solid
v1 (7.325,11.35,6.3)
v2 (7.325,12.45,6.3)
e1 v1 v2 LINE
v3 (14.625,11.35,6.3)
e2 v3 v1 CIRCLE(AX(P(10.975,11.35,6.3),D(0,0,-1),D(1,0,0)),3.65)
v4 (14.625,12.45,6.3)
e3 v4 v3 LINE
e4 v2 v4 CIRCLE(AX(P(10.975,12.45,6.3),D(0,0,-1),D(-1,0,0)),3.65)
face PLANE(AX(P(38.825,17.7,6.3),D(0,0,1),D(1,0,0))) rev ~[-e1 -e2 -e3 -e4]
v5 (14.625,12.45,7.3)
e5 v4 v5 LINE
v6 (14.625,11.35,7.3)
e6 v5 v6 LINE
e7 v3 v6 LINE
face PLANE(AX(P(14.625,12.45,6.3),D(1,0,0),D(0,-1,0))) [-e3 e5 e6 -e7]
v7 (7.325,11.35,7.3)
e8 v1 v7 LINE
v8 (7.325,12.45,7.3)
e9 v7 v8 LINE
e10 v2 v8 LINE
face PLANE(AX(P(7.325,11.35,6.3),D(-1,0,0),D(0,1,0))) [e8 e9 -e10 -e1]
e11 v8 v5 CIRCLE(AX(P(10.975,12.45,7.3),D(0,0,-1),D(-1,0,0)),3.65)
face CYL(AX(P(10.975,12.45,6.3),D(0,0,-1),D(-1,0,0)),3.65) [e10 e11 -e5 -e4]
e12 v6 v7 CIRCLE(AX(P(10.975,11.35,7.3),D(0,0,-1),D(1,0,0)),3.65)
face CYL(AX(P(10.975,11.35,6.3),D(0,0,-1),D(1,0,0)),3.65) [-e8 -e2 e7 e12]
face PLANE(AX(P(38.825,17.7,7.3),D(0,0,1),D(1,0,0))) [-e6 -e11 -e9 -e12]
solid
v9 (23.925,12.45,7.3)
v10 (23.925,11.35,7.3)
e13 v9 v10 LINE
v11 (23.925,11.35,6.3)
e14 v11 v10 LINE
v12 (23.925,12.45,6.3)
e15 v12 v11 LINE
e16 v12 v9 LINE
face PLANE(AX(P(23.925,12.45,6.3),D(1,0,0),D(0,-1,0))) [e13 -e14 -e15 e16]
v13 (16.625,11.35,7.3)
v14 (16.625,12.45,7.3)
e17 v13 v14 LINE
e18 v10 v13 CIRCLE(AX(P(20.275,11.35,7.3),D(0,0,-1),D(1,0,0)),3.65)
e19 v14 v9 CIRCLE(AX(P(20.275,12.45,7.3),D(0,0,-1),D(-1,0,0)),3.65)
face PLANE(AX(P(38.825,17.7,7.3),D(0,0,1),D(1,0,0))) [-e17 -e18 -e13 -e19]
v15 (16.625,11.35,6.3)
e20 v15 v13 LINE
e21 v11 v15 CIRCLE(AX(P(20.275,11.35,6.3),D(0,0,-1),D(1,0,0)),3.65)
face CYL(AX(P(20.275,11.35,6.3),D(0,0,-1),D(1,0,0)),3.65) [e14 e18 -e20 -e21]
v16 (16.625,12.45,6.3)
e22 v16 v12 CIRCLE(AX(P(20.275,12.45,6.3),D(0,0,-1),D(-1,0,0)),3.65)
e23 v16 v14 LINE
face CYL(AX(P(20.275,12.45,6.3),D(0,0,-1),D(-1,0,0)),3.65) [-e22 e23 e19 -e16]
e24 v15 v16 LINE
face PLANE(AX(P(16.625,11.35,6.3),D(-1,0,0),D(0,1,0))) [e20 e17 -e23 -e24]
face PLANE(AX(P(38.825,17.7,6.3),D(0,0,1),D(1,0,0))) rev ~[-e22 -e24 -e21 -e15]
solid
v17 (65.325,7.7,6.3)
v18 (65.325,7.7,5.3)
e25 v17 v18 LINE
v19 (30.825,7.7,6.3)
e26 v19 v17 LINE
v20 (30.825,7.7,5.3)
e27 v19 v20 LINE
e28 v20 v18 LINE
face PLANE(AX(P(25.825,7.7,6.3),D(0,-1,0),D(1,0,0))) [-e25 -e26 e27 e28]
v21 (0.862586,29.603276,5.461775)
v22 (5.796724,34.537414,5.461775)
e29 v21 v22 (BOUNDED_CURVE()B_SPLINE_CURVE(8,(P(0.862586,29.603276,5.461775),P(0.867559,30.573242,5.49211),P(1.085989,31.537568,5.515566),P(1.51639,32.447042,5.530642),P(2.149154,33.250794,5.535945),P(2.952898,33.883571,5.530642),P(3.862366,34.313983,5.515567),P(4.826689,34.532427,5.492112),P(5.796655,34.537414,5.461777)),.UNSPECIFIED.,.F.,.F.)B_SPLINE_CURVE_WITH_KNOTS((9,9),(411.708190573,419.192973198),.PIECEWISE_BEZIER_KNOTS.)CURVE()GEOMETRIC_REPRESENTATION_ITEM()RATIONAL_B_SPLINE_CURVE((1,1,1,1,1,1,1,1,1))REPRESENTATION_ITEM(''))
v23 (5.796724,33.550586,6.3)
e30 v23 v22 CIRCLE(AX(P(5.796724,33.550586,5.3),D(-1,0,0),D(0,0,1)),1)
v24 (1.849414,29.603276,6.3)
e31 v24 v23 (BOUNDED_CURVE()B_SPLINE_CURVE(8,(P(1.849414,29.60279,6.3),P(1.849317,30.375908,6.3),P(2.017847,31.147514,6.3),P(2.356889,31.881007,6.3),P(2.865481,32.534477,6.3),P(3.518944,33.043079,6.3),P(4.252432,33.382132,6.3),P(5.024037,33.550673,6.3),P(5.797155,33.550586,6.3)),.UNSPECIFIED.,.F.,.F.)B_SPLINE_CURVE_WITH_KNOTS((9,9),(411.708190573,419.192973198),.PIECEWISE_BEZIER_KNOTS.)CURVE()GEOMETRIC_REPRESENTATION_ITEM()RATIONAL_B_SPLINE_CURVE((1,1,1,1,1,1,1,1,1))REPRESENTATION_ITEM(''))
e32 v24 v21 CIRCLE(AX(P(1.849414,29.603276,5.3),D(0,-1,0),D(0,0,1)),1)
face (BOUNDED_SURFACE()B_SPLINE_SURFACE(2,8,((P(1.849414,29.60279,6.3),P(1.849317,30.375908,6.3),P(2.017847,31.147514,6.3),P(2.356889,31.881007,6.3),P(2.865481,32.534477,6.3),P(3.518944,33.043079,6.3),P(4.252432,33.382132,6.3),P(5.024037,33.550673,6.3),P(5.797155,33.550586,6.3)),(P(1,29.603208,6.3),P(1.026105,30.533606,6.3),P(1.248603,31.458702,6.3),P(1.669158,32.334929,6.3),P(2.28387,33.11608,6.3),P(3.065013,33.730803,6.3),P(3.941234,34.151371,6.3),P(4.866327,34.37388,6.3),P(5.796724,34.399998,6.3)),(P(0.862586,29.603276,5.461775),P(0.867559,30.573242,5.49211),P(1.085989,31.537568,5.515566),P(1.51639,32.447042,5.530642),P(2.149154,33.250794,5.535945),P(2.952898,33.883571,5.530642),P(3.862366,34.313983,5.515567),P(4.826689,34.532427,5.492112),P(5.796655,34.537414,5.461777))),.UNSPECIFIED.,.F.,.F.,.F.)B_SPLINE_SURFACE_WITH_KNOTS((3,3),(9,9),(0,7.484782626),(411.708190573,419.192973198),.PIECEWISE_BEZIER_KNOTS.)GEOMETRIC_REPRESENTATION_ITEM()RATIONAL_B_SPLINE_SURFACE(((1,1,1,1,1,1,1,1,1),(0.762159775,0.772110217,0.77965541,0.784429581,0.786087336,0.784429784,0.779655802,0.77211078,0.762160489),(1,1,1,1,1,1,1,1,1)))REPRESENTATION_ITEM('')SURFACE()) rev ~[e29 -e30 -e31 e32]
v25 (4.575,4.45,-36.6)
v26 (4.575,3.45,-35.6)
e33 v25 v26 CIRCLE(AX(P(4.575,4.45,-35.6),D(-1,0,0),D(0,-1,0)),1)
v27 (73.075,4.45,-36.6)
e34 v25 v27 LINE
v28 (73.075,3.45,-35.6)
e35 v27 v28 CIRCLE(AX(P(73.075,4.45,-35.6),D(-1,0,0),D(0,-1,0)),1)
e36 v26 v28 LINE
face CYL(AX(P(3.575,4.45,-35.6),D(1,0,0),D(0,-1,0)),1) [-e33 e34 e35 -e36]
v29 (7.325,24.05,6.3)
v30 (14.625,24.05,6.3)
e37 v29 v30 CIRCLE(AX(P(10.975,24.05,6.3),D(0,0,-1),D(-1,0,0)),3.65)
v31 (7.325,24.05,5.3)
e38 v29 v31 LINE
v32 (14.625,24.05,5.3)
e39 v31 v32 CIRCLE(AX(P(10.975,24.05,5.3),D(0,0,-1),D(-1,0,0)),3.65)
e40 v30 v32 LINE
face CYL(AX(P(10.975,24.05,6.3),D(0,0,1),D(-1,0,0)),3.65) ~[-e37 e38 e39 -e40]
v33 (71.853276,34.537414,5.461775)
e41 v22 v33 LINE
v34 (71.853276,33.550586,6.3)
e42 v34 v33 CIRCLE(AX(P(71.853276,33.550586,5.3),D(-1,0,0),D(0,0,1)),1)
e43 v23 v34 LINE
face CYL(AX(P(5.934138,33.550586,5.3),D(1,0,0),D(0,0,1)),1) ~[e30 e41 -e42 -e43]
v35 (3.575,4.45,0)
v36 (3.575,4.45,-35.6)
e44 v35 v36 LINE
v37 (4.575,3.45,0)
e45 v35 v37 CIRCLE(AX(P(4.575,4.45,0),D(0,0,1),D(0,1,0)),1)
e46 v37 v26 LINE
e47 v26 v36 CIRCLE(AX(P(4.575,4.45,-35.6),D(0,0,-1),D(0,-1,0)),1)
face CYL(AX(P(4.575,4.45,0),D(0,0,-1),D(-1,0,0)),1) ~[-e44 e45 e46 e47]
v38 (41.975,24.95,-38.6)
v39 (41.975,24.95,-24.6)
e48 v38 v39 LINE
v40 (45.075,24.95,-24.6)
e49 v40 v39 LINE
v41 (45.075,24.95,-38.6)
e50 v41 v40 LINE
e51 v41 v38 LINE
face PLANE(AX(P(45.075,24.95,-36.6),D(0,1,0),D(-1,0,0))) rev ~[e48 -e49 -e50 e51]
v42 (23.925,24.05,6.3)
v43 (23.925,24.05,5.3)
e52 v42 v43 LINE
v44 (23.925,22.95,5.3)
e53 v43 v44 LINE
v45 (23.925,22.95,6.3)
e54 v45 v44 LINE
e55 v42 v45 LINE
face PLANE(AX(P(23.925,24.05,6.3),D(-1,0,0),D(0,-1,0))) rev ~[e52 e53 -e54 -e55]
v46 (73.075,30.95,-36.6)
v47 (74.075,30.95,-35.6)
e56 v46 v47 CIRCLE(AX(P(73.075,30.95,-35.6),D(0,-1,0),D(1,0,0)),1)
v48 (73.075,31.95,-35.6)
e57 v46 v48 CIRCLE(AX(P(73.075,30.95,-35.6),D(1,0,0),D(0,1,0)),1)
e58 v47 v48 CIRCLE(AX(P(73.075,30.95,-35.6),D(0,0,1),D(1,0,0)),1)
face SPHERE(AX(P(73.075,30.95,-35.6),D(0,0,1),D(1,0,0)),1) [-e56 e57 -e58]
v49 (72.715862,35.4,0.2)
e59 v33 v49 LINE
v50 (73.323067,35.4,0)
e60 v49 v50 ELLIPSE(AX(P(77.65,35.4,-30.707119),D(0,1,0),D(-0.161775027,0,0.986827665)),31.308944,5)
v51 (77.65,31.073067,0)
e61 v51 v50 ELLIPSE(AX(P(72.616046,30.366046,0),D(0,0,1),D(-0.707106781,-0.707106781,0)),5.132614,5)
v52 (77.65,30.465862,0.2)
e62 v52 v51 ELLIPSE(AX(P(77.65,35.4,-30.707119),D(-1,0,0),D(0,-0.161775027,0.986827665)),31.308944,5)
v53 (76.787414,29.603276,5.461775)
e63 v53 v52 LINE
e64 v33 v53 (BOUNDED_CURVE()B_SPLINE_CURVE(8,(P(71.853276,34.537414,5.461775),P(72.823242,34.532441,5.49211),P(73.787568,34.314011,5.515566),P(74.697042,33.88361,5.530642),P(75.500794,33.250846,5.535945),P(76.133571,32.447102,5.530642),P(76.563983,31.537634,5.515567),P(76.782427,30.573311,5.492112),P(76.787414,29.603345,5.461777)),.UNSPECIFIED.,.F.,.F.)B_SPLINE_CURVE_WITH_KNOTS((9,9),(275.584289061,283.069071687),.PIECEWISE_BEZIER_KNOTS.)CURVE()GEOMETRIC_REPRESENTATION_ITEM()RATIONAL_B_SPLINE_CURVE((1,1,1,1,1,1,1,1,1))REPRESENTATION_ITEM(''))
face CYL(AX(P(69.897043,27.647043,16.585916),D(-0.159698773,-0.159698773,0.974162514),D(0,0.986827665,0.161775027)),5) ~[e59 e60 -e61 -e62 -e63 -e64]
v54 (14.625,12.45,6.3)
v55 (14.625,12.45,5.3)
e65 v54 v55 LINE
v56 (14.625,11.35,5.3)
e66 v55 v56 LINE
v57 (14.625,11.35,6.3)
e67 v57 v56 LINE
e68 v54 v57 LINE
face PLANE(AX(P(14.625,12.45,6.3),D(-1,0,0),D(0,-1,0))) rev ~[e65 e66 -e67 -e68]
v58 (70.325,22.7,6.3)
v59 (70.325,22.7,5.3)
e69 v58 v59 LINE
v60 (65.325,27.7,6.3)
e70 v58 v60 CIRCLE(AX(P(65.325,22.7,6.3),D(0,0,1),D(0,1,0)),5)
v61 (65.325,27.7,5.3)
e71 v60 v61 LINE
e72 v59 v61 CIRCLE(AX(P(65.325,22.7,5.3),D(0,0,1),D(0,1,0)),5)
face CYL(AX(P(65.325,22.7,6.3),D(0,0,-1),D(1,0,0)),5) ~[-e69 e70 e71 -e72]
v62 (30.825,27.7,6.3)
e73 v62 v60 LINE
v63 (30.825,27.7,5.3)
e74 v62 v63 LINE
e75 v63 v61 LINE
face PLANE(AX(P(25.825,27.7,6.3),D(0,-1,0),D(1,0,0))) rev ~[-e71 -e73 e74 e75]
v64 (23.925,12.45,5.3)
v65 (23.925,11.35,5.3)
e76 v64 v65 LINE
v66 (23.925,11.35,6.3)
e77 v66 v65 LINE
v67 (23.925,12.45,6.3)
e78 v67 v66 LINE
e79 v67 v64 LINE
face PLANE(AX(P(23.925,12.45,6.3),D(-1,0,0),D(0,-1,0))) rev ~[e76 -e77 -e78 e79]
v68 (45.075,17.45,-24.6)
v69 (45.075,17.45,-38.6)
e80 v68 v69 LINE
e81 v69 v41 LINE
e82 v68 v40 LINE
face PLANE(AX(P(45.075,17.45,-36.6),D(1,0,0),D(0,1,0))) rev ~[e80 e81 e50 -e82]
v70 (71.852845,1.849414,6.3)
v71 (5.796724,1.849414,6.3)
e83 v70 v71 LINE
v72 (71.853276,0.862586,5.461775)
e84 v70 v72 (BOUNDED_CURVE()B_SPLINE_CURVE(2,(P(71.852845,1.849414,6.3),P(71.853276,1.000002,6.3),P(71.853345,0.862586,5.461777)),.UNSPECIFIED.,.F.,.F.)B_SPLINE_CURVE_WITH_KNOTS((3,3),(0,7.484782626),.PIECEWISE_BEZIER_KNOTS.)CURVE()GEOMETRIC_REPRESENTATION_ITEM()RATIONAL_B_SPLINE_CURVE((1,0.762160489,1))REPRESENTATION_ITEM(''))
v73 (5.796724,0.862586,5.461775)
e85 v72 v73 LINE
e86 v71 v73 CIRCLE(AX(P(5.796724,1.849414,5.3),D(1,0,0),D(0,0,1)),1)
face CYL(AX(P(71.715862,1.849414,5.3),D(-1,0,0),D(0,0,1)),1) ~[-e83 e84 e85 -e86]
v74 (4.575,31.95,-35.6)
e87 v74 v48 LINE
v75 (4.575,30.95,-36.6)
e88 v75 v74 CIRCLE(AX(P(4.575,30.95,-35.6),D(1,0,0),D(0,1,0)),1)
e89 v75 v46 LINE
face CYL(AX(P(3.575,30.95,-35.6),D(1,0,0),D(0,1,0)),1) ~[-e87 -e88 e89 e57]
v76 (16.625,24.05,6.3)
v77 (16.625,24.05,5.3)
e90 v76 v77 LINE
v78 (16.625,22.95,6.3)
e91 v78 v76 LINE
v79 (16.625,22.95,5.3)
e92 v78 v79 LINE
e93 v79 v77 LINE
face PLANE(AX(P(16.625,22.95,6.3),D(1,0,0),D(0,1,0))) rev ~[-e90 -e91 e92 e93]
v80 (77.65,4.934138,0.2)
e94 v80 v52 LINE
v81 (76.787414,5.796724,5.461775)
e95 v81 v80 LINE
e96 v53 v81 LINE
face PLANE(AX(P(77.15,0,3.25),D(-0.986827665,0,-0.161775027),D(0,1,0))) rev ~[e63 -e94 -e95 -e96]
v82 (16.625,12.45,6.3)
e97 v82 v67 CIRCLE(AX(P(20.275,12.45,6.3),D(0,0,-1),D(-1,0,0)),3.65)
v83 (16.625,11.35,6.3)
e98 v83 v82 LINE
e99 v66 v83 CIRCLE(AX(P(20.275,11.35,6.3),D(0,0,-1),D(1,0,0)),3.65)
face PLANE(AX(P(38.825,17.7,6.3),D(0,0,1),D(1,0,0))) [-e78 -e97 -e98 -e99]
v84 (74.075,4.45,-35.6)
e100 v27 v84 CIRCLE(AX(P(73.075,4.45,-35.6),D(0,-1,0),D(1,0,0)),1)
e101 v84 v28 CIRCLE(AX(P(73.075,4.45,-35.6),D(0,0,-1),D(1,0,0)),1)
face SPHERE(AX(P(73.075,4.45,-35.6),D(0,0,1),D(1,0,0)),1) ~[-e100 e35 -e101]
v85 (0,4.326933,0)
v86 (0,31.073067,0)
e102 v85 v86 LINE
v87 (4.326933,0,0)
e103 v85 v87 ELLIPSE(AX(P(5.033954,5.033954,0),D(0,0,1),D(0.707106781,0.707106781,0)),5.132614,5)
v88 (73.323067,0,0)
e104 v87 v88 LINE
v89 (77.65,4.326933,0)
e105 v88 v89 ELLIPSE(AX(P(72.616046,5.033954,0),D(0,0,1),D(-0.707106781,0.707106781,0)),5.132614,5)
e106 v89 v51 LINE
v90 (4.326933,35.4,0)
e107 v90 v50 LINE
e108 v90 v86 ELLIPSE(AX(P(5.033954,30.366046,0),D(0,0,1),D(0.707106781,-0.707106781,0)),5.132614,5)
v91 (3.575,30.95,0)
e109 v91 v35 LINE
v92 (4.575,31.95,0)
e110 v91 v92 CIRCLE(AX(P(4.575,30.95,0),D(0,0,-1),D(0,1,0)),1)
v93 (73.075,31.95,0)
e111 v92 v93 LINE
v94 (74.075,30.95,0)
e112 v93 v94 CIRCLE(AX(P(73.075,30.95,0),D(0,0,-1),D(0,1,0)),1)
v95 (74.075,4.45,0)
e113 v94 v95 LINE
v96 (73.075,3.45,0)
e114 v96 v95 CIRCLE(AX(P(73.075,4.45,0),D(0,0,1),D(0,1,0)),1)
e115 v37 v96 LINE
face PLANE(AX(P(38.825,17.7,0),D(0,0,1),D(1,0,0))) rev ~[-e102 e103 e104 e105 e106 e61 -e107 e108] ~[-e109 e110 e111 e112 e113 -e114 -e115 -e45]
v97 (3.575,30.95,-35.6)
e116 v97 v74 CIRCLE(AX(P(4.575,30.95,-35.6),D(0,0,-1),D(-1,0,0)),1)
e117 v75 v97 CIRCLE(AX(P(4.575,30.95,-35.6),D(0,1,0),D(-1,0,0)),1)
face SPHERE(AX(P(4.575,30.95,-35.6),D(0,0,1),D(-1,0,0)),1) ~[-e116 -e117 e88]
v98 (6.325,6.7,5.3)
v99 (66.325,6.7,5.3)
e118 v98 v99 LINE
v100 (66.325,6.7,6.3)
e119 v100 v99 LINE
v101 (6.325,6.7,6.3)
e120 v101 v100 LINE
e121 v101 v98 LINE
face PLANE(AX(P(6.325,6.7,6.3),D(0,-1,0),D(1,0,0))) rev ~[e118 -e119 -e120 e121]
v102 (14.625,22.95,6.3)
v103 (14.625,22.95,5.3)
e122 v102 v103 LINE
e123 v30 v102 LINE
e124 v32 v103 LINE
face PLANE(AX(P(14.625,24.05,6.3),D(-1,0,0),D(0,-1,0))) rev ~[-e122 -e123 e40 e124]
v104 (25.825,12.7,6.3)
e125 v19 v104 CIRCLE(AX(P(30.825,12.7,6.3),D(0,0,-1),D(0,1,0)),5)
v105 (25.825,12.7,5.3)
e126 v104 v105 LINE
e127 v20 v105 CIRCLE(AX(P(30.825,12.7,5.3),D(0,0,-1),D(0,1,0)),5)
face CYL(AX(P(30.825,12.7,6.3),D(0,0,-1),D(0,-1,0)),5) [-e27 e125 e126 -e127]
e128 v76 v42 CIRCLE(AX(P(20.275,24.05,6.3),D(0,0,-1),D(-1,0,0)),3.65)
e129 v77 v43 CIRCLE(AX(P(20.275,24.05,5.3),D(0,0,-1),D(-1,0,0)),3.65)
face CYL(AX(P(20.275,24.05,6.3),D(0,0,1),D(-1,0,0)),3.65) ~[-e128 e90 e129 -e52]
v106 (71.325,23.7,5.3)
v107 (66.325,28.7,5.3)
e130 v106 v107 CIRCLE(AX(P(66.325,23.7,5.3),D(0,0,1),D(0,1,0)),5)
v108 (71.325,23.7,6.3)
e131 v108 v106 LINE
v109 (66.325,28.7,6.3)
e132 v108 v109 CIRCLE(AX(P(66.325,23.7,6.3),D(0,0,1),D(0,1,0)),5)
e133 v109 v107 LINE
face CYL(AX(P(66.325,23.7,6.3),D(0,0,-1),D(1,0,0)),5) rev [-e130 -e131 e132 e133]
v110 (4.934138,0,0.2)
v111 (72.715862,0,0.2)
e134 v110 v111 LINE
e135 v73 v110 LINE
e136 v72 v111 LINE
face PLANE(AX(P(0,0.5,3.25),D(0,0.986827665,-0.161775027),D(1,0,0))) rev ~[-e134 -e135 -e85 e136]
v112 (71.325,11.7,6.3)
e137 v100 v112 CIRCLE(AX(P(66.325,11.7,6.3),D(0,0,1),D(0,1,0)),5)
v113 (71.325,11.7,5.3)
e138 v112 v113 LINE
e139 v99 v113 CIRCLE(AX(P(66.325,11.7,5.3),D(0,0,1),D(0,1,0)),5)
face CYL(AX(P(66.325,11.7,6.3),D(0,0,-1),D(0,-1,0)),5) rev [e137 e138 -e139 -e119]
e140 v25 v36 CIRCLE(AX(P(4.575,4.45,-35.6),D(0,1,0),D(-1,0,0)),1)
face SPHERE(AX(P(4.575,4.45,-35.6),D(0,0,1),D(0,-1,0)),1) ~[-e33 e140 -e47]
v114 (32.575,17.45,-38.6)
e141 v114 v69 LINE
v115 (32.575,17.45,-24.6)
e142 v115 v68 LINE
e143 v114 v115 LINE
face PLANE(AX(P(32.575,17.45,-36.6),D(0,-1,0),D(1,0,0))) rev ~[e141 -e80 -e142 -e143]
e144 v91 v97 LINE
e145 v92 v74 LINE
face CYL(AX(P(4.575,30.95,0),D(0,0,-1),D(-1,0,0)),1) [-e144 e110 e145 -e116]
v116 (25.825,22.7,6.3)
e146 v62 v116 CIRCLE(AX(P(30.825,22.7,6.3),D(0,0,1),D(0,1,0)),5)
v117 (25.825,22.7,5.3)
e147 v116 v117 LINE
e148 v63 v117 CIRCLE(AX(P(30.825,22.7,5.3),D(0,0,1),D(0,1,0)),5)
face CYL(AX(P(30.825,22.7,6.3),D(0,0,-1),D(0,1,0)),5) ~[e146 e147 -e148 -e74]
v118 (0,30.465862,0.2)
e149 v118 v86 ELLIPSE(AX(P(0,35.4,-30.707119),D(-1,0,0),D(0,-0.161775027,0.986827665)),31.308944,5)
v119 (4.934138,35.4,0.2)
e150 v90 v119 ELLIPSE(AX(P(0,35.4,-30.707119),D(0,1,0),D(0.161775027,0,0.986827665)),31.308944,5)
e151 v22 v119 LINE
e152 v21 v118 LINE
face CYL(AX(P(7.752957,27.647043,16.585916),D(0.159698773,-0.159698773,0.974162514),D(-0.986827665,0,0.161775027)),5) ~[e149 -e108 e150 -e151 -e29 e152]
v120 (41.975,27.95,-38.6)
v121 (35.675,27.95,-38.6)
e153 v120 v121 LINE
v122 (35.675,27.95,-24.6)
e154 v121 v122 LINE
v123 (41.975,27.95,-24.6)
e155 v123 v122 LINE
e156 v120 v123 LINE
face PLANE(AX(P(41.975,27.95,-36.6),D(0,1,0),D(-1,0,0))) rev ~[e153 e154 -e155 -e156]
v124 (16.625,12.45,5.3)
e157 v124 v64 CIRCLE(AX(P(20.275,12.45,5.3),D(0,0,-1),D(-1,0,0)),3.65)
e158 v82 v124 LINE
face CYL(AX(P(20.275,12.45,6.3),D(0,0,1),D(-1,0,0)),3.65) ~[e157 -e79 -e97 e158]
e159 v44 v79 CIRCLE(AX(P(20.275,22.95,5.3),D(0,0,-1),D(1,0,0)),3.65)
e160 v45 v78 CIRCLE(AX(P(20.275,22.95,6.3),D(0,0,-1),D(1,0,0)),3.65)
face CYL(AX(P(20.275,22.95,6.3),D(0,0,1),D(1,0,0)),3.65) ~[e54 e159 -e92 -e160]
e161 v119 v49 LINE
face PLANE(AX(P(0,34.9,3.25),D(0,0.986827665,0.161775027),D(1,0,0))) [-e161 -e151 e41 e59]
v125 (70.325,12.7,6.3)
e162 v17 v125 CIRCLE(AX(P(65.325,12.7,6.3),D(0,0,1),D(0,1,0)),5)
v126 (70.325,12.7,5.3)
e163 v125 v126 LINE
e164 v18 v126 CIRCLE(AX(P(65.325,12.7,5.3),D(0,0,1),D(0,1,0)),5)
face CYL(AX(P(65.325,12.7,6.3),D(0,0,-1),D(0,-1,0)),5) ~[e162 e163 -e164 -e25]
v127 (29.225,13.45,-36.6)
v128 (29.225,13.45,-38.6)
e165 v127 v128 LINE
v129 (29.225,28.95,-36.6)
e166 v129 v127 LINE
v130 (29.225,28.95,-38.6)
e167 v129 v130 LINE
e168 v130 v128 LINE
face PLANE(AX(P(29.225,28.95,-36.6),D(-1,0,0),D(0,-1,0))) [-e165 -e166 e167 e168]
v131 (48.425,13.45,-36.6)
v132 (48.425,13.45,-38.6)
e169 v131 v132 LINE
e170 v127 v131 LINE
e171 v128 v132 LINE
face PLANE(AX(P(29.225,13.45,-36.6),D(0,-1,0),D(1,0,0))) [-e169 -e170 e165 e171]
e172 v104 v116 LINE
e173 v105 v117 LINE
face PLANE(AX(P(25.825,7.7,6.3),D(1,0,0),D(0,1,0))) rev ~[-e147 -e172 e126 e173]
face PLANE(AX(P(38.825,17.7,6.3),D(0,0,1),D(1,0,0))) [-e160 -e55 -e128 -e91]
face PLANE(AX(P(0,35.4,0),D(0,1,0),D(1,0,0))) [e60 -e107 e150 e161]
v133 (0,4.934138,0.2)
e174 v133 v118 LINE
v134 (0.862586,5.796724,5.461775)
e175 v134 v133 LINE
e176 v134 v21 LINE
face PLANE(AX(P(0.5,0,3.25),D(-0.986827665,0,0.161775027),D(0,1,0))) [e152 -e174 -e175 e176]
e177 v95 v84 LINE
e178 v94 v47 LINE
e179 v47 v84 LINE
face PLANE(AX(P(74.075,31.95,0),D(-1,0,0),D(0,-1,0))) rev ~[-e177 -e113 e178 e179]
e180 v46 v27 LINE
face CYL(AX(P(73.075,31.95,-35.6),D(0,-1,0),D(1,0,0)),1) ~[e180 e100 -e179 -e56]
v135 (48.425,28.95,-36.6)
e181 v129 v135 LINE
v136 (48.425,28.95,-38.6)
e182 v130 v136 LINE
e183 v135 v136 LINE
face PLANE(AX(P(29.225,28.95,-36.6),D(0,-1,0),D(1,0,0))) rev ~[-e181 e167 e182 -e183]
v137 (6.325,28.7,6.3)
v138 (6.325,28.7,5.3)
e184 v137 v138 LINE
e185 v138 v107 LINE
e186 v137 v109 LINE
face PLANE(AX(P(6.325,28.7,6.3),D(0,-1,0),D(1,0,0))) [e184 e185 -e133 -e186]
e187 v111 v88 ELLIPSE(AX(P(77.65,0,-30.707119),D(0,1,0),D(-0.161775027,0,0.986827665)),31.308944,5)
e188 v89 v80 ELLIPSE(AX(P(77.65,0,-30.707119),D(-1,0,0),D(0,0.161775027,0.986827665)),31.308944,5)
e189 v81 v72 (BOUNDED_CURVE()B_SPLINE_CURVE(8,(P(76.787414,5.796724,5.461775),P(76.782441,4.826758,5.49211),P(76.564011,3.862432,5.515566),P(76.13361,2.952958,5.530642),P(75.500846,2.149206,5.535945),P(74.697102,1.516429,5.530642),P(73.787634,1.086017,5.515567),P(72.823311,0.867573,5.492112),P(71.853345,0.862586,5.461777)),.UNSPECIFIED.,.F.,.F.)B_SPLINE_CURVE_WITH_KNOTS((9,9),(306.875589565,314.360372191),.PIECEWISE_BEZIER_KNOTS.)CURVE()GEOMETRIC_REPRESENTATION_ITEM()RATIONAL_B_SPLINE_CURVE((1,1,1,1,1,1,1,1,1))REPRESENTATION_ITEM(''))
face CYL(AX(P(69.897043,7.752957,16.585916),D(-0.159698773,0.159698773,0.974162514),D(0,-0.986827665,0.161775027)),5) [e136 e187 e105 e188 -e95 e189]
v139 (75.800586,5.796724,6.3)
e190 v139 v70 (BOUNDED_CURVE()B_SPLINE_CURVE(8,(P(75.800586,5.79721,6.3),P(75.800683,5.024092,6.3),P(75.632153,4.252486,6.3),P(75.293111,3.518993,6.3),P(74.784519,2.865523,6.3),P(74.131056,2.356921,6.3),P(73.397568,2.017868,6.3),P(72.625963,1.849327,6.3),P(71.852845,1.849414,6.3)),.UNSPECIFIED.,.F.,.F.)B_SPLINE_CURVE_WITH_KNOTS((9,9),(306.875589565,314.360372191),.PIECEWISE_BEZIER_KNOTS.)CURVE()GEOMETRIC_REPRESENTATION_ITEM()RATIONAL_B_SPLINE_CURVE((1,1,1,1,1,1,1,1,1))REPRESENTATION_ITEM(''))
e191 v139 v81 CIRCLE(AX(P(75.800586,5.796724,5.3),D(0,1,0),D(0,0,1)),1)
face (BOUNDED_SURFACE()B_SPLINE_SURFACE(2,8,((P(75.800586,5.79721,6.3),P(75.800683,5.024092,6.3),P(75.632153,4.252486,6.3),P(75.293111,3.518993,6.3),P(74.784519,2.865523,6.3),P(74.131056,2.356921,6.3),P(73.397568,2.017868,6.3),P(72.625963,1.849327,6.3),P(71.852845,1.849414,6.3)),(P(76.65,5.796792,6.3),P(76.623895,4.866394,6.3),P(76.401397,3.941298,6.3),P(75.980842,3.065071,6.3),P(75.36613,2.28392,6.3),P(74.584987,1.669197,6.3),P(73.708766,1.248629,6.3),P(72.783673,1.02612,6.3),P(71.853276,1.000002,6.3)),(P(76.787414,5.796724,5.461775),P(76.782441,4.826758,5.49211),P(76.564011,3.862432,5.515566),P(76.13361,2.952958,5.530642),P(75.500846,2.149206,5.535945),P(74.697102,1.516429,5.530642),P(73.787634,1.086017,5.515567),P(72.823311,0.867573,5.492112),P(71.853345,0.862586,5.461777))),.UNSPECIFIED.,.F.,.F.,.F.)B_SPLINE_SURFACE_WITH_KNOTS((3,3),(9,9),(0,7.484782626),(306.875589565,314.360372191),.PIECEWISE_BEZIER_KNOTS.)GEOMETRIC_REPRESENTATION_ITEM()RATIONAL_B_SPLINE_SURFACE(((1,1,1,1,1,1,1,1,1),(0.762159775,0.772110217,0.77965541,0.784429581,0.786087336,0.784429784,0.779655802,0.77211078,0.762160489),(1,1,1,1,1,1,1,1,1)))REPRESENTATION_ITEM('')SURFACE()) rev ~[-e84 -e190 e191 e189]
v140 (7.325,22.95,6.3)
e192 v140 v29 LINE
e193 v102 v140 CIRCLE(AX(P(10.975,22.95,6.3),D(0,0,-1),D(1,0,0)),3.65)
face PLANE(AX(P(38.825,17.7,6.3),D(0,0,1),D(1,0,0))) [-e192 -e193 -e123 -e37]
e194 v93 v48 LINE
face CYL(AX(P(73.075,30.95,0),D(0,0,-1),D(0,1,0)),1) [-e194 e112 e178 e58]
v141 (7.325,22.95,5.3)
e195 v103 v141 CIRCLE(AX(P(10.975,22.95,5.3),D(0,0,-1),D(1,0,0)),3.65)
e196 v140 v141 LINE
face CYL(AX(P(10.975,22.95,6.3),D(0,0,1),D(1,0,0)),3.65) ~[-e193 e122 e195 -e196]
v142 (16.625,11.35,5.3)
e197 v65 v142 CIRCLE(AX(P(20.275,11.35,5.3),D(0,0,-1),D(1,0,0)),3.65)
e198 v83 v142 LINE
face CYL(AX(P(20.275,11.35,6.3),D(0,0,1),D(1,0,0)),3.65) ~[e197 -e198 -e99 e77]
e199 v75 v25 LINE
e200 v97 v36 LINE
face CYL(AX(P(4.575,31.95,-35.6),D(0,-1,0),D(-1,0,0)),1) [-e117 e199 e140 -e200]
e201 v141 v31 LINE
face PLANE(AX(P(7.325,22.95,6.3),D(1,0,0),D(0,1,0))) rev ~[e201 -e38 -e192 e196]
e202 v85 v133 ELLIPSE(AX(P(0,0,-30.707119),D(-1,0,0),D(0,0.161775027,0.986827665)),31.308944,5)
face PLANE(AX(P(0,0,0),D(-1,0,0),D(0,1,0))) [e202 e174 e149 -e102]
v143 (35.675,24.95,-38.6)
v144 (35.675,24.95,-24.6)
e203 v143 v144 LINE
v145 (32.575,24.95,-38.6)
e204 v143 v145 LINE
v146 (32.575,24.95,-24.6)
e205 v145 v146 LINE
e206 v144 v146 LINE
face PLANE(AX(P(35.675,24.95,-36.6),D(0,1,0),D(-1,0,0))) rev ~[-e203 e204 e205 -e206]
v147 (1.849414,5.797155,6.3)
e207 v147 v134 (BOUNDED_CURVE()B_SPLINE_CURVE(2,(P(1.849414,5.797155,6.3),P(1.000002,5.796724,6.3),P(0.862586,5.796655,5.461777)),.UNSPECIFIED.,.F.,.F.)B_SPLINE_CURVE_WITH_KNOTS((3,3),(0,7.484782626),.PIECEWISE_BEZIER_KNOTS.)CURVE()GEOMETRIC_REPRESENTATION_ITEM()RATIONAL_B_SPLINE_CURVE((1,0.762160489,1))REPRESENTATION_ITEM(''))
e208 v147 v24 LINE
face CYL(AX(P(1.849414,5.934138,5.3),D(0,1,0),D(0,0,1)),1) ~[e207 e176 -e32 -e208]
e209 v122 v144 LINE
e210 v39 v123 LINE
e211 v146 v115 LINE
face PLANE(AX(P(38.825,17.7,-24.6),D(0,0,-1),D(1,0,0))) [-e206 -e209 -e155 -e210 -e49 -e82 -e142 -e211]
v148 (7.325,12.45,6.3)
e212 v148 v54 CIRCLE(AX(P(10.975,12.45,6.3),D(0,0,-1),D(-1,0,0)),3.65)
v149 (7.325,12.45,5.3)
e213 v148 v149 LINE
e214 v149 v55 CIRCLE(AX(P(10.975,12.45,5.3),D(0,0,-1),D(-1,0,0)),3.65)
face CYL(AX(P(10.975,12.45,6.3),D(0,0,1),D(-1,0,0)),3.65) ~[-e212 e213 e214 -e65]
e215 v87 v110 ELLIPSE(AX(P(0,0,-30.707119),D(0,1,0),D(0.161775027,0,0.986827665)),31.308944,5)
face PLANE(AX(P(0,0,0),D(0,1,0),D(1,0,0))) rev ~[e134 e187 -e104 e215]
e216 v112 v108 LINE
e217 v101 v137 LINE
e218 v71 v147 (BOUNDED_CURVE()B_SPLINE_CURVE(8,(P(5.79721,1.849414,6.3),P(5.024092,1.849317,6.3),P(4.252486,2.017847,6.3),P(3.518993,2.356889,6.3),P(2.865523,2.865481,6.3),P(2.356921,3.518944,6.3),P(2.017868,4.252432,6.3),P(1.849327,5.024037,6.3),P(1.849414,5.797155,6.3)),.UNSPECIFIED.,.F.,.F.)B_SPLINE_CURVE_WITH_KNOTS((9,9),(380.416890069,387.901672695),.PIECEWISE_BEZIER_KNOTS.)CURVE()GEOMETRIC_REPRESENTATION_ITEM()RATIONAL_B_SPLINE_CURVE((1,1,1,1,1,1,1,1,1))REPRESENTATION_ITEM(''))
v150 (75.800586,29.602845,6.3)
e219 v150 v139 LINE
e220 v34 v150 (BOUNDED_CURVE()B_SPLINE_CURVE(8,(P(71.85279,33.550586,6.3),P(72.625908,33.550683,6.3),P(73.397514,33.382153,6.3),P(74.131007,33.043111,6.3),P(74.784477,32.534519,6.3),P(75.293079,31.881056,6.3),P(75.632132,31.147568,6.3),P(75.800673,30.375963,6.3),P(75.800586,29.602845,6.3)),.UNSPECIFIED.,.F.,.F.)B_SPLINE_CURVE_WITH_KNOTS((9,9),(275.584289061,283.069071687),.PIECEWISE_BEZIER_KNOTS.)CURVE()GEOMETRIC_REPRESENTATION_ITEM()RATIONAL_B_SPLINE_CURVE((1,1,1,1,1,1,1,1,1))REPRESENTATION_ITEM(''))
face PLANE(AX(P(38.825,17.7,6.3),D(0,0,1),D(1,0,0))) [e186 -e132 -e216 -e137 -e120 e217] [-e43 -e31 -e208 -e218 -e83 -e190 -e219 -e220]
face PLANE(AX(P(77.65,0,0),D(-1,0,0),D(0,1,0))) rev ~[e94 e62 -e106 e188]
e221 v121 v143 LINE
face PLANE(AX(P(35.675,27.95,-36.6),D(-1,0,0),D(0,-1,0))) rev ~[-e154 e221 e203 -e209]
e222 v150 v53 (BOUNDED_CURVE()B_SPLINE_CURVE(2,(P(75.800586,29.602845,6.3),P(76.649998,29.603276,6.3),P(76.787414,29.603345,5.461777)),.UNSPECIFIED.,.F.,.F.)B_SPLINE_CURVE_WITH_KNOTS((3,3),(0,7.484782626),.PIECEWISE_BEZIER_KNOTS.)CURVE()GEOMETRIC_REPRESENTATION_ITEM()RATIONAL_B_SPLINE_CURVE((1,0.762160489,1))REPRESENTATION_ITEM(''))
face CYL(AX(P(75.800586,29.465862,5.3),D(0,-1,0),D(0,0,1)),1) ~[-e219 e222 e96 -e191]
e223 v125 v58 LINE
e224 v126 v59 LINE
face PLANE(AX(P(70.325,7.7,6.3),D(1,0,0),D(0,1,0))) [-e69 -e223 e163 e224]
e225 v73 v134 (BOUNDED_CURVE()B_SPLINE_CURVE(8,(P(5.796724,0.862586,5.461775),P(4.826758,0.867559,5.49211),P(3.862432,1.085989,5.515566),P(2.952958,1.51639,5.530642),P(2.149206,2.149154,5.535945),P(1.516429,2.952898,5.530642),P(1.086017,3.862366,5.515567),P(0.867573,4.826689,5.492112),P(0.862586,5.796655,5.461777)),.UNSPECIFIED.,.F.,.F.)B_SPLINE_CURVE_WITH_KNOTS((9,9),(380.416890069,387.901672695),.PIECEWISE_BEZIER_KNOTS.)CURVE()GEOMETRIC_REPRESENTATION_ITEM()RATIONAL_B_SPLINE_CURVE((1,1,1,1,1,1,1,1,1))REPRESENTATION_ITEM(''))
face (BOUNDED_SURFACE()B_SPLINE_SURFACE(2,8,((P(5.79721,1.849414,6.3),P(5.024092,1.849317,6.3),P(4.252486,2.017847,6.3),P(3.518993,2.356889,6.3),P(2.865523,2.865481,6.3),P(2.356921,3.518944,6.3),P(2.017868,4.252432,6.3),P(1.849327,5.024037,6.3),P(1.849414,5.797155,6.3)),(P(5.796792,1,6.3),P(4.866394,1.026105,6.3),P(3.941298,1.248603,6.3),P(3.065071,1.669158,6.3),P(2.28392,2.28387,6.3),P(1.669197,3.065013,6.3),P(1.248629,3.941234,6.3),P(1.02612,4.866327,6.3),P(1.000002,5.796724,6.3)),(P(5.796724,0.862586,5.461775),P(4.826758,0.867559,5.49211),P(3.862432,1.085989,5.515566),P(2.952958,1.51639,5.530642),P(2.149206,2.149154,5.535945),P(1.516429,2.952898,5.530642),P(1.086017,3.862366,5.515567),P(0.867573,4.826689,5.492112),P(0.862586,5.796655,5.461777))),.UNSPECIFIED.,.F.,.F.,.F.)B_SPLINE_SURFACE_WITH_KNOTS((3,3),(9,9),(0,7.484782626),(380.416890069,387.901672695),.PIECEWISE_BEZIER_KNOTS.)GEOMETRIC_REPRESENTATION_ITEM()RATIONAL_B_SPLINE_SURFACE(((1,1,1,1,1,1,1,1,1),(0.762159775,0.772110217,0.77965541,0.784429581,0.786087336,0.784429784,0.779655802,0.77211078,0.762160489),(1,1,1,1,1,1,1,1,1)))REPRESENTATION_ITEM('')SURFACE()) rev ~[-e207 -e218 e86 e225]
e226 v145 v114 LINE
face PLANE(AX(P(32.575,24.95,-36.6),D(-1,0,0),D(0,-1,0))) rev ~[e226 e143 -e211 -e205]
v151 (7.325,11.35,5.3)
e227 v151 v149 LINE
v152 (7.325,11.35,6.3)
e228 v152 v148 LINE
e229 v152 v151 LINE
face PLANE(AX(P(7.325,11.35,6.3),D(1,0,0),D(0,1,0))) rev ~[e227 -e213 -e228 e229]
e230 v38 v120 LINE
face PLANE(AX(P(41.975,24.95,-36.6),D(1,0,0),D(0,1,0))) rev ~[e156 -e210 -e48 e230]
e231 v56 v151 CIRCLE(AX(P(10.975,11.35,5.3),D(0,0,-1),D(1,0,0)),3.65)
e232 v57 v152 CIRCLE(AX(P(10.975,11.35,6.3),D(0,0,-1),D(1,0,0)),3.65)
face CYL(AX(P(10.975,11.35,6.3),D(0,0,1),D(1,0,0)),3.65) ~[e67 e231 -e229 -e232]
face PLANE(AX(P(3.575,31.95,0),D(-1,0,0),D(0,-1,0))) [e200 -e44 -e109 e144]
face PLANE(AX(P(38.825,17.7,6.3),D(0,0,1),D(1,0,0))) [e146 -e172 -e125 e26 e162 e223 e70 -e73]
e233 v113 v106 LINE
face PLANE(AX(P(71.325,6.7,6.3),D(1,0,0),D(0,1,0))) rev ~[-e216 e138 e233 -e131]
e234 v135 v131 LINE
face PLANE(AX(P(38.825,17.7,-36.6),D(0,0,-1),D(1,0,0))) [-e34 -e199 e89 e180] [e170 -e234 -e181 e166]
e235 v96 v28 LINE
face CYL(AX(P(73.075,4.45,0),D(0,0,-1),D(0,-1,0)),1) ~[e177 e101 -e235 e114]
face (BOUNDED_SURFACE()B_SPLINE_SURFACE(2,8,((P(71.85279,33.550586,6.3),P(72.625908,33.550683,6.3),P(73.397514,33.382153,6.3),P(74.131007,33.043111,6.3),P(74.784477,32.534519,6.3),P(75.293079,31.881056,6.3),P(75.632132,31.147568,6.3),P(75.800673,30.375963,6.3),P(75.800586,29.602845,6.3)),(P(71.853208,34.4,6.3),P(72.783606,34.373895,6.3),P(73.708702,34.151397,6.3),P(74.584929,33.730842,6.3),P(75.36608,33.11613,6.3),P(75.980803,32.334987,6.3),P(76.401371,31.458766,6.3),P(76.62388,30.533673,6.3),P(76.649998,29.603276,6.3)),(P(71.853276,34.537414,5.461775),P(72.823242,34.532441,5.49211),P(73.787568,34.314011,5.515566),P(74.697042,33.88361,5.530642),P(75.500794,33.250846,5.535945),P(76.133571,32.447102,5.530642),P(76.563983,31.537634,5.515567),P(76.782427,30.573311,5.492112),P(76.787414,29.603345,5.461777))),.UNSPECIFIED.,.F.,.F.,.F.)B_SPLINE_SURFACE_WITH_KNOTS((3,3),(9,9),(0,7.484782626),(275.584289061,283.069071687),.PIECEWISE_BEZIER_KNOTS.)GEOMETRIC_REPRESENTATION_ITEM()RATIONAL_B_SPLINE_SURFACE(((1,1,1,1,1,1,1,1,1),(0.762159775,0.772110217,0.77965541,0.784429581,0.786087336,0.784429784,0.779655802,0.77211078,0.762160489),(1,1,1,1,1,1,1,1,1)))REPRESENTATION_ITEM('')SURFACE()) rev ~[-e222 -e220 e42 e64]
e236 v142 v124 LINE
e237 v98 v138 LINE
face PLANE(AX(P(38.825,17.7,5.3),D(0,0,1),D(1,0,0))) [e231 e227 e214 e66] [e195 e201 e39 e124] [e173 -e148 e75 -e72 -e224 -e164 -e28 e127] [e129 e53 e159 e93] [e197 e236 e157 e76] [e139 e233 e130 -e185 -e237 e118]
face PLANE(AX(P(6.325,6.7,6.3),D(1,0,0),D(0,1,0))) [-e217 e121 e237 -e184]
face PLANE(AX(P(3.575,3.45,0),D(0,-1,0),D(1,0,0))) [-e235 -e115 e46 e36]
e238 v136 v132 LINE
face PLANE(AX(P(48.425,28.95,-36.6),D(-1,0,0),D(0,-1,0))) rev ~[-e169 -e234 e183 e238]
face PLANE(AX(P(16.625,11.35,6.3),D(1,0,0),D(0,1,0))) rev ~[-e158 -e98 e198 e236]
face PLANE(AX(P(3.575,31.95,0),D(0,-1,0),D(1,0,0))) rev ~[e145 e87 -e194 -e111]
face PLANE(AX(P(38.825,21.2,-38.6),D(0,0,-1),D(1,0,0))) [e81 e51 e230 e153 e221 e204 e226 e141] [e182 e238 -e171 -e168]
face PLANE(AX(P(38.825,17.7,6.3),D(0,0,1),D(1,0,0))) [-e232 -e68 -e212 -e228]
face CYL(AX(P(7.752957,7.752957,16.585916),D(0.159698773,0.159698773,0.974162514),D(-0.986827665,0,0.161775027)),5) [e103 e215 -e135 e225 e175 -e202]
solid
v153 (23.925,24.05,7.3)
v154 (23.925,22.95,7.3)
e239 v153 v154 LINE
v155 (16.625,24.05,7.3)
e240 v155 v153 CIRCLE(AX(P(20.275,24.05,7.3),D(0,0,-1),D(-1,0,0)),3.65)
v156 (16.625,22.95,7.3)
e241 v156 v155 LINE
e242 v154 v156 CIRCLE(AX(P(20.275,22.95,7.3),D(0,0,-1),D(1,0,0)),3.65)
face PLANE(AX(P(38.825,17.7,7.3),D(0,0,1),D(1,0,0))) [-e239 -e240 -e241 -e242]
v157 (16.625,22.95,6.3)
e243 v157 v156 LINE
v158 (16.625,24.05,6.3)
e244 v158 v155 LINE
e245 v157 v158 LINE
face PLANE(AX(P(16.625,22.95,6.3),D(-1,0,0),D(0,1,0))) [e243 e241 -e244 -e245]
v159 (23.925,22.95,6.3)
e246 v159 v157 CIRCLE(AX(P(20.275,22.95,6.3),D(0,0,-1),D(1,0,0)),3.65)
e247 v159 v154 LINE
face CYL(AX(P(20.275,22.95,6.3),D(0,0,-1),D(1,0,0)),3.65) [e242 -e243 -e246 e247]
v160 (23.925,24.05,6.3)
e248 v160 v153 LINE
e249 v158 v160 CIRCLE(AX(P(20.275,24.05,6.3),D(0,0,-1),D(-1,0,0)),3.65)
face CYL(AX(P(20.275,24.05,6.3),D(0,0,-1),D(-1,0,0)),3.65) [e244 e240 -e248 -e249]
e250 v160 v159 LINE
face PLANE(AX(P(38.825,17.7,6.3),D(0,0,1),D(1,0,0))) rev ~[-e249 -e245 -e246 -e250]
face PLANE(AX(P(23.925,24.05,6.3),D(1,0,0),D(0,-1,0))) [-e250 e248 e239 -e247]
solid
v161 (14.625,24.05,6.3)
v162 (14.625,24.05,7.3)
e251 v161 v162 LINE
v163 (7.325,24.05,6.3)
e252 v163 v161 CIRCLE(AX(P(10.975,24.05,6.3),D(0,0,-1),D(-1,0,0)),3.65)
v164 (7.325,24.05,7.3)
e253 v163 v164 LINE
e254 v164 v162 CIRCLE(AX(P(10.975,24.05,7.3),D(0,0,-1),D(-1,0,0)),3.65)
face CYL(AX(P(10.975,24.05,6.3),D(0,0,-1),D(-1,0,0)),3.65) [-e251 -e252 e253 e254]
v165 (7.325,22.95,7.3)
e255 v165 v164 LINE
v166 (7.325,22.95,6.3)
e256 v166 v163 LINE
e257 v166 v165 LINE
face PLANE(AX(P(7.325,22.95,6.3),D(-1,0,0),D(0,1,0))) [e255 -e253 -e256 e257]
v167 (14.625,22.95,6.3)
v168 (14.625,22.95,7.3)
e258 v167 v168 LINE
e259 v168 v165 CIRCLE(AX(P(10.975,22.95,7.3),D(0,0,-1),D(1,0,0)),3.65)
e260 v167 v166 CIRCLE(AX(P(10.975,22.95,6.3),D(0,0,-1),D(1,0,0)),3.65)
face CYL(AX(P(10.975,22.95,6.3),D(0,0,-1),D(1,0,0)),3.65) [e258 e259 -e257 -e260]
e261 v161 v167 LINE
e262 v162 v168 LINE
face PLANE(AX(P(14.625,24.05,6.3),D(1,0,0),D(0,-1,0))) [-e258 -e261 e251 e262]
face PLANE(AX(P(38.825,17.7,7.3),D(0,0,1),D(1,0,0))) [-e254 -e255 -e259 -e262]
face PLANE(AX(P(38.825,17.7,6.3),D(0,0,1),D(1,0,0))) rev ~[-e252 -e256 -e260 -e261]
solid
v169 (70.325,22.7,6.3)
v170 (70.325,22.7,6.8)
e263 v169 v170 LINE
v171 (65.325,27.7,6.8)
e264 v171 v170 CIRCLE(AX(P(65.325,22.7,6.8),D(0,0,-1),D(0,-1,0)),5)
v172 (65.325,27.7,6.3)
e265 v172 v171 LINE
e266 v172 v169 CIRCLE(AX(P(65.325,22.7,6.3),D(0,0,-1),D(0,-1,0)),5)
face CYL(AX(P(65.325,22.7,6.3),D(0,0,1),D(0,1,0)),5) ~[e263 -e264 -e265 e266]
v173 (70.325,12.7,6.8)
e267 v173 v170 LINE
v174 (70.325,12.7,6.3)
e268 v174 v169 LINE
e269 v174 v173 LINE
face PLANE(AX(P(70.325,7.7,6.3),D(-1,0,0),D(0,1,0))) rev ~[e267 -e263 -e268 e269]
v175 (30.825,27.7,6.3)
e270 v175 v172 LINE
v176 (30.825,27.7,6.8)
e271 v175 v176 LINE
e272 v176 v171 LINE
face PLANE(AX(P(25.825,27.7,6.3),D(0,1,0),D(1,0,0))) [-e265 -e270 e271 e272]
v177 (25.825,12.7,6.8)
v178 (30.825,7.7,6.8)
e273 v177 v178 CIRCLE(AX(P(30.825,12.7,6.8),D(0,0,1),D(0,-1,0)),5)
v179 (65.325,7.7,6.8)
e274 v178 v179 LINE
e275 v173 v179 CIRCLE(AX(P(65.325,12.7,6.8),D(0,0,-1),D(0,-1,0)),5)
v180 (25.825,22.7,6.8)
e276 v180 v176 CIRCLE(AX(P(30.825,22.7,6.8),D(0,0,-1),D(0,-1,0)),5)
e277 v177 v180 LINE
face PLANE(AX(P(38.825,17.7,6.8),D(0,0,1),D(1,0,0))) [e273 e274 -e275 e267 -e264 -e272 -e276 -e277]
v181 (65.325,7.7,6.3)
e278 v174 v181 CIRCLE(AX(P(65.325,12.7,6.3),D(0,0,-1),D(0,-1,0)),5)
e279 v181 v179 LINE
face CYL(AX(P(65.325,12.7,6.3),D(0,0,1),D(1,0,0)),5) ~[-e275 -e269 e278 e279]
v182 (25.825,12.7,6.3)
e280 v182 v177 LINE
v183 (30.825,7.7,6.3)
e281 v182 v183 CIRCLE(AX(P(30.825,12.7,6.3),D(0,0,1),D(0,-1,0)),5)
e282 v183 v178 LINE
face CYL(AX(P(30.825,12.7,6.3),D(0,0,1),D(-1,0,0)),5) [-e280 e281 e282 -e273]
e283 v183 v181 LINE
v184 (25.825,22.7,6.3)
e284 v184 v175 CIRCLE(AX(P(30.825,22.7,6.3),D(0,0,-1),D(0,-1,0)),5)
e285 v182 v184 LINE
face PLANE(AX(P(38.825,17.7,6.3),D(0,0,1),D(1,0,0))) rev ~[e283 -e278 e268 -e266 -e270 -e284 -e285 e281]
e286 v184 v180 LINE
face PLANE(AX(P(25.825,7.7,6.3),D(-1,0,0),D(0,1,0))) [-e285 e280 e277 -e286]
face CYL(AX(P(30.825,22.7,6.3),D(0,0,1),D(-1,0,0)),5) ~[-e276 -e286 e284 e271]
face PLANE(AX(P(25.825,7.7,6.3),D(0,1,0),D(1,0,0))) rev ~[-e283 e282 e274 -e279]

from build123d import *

# Parameters (mm, degrees)
F0_W         = 77.65
F0_H         = 35.4
F1_DEPTH     = 6.3
F2_W         = 70.5
F2_H         = 28.5
F3_DEPTH     = 36.6
F4_W         = 19.2
F4_H         = 15.5
F5_DEPTH     = 2
F6_DEPTH     = 12
F7_W         = 65
F7_H         = 22
F7_W_2       = 44.5
F7_H_2       = 20
F8_DEPTH     = 1
F9_DEPTH     = 1
F10_DEPTH    = 0.5
F11_SIZE2    = 6.1
F11_SIZE     = 1
F12_T1_DEPTH = 54.9699145881
F12_T3_DEPTH = 54.9699145881
F12_T5_DEPTH = 54.9699145881
F12_T7_DEPTH = 54.9699145881
F13_R        = 1
F14_R        = 5
F14_2_R      = 5


# Not quite as in the source:
# - a fillet or chamfer that OpenCascade refuses, or shapes differently, is made with other operations: its cross-section is extruded or revolved along the edge and cut away or added


with BuildPart() as f1:
    # F0 (on Top) → F1 (new body)
    with BuildSketch(Plane.XY):
        with Locations((38.825, 17.7)):
            Rectangle(F0_W, F0_H)
    extrude(amount=F1_DEPTH)

    # F2 (on face) → F3 (join)
    with BuildSketch(Plane(origin=(0, 0, 0), x_dir=(1, 0, 0), z_dir=(0, 0, -1))):
        with Locations((38.825, -17.7)):
            Rectangle(F2_W, F2_H)
    extrude(amount=F3_DEPTH)

    # F4 (on face) → F5 (join)
    with BuildSketch(Plane(origin=(0, 0, -36.6), x_dir=(1, 0, 0), z_dir=(0, 0, -1))):
        with Locations((38.825, -21.2)):
            Rectangle(F4_W, F4_H)
        Polygon((45.075, -17.45), (45.075, -24.95), (41.975, -24.95), (41.975, -27.95), (35.675, -27.95), (35.675, -24.95), (32.575, -24.95), (32.575, -17.45), align=None, mode=Mode.SUBTRACT)
    extrude(amount=F5_DEPTH)

    # F6 (cut): a face of the model
    f6_faces = [f1.faces().sort_by_distance(p)[0] for p in [
        (38.825, 22.0808255659, -36.6),
    ]]
    extrude(f6_faces, amount=-F6_DEPTH, mode=Mode.SUBTRACT)

    # F7 (on face) → F8 (cut)
    with BuildSketch(Plane.XY.offset(6.3)):
        with Locations((38.825, 17.7)):
            Rectangle(F7_W, F7_H)
        with BuildLine():
            ThreePointArc((14.625, 11.35), (10.975, 7.7), (7.325, 11.35))
            Line((7.325, 11.35), (7.325, 11.9))
            Line((7.325, 11.9), (7.325, 12.45))
            ThreePointArc((7.325, 12.45), (10.975, 16.1), (14.625, 12.45))
            Line((14.625, 12.45), (14.625, 11.9))
            Line((14.625, 11.9), (14.625, 11.35))
        make_face(mode=Mode.SUBTRACT)
        with BuildLine():
            ThreePointArc((16.625, 12.45), (20.275, 16.1), (23.925, 12.45))
            Line((23.925, 12.45), (23.925, 11.9))
            Line((23.925, 11.9), (23.925, 11.35))
            ThreePointArc((23.925, 11.35), (20.275, 7.7), (16.625, 11.35))
            Line((16.625, 11.35), (16.625, 11.9))
            Line((16.625, 11.9), (16.625, 12.45))
        make_face(mode=Mode.SUBTRACT)
        with BuildLine():
            Line((7.325, 23.5), (7.325, 24.05))
            ThreePointArc((7.325, 24.05), (10.975, 27.7), (14.625, 24.05))
            Line((14.625, 24.05), (14.625, 23.5))
            Line((14.625, 23.5), (14.625, 22.95))
            ThreePointArc((14.625, 22.95), (10.975, 19.3), (7.325, 22.95))
            Line((7.325, 22.95), (7.325, 23.5))
        make_face(mode=Mode.SUBTRACT)
        with BuildLine():
            ThreePointArc((16.625, 24.05), (20.275, 27.7), (23.925, 24.05))
            Line((23.925, 24.05), (23.925, 23.5))
            Line((23.925, 23.5), (23.925, 22.95))
            ThreePointArc((23.925, 22.95), (20.275, 19.3), (16.625, 22.95))
            Line((16.625, 22.95), (16.625, 23.5))
            Line((16.625, 23.5), (16.625, 24.05))
        make_face(mode=Mode.SUBTRACT)
        with Locations((48.075, 17.7)):
            Rectangle(F7_W_2, F7_H_2, mode=Mode.SUBTRACT)
    extrude(amount=-F8_DEPTH, mode=Mode.SUBTRACT)


with BuildPart() as f9:
    # F9 (new): a face of the model
    f9_faces = [f1.part.faces().sort_by_distance(p)[0] for p in [
        (20.275, 11.9, 6.3),
    ]]
    extrude(f9_faces, amount=F9_DEPTH)


with BuildPart() as f9b:
    # F9#2 (new): a face of the model
    f9_2_faces = [f1.part.faces().sort_by_distance(p)[0] for p in [
        (10.975, 11.9, 6.3),
    ]]
    extrude(f9_2_faces, amount=F9_DEPTH)


with BuildPart() as f9c:
    # F9#3 (new): a face of the model
    f9_3_faces = [f1.part.faces().sort_by_distance(p)[0] for p in [
        (10.975, 23.5, 6.3),
    ]]
    extrude(f9_3_faces, amount=F9_DEPTH)


with BuildPart() as f9d:
    # F9#4 (new): a face of the model
    f9_4_faces = [f1.part.faces().sort_by_distance(p)[0] for p in [
        (20.275, 23.5, 6.3),
    ]]
    extrude(f9_4_faces, amount=F9_DEPTH)


with BuildPart() as f10:
    # F10 (new): a face of the model
    f10_faces = [f1.part.faces().sort_by_distance(p)[0] for p in [
        (48.075, 17.7, 6.3),
    ]]
    extrude(f10_faces, amount=F10_DEPTH)

    # F14#2
    f14_2_edges = [f10.edges().sort_by_distance(p)[0] for p in [
        (25.825, 7.7, 6.55),
        (25.825, 27.7, 6.55),
        (70.325, 27.7, 6.55),
        (70.325, 7.7, 6.55),
    ]]
    fillet(f14_2_edges, radius=F14_2_R)


with BuildPart() as f1_1:
    add(f1.part)

    # F11
    f11_edges = [f1_1.edges().sort_by_distance(p)[0] for p in [
        (77.65, 17.7, 6.3),
        (38.825, 35.4, 6.3),
        (0, 17.7, 6.3),
        (38.825, 0, 6.3),
    ]]
    f11_side = f1_1.faces().sort_by_distance((0.853386, 17.7, 6.3))[0]
    chamfer(f11_edges, length=F11_SIZE, length2=F11_SIZE2, reference=f11_side)

    # F12: fillet of radius 5 on 4 edges, made by hand

    # F12_s2 → F12_t1 (cut)
    with BuildSketch(Plane(origin=(2.9757714869, 2.9757714869, 18.1522060699), x_dir=(0.7071067812, -0.7071067812, 0), z_dir=(-0.1596987728, -0.1596987728, -0.9741625141))):
        with BuildLine():
            ThreePointArc((-3.4889626693, -3.3536470115), (0, -1.9351466265), (3.4889626693, -3.3536470115))
            Line((3.4889626693, -3.3536470115), (0, 0.0451696341))
            Line((0, 0.0451696341), (-3.4889626693, -3.3536470115))
        make_face()
    extrude(amount=F12_T1_DEPTH, mode=Mode.SUBTRACT)

    # F12_s4 → F12_t3 (cut)
    with BuildSketch(Plane(origin=(-0.9954093344, 0.9954093344, 6.0719969396), x_dir=(0.7071067812, 0.7071067812, 0), z_dir=(0.1596987728, -0.1596987728, -0.9741625141))):
        with BuildLine():
            ThreePointArc((51.4178788898, 50.1345398044), (54.9068415591, 51.5530401894), (58.3958042284, 50.1345398044))
            Line((58.3958042284, 50.1345398044), (54.9068415591, 53.53335645))
            Line((54.9068415591, 53.53335645), (51.4178788898, 50.1345398044))
        make_face()
    extrude(amount=F12_T3_DEPTH, mode=Mode.SUBTRACT)

    # F12_s6 → F12_t5 (cut)
    with BuildSketch(Plane(origin=(-0.0925784239, -0.0925784239, 0.5647283856), x_dir=(-0.7071067812, 0.7071067812, 0), z_dir=(0.1596987728, 0.1596987728, -0.9741625141))):
        with BuildLine():
            ThreePointArc((-26.3862988358, 74.5193667624), (-29.8752615051, 75.9378671474), (-33.3642241744, 74.5193667624))
            Line((-33.3642241744, 74.5193667624), (-29.8752615051, 77.918183408))
            Line((-29.8752615051, 77.918183408), (-26.3862988358, 74.5193667624))
        make_face()
    extrude(amount=F12_T5_DEPTH, mode=Mode.SUBTRACT)

    # F12_s8 → F12_t7 (cut)
    with BuildSketch(Plane(origin=(2.0729405764, -2.0729405764, 12.6449375159), x_dir=(-0.7071067812, -0.7071067812, 0), z_dir=(-0.1596987728, 0.1596987728, -0.9741625141))):
        with BuildLine():
            ThreePointArc((-21.5426173847, 21.0311799464), (-25.031580054, 22.4496803314), (-28.5205427233, 21.0311799464))
            Line((-28.5205427233, 21.0311799464), (-25.031580054, 24.429996592))
            Line((-25.031580054, 24.429996592), (-21.5426173847, 21.0311799464))
        make_face()
    extrude(amount=F12_T7_DEPTH, mode=Mode.SUBTRACT)

    # F13
    f13_edges = [f1_1.edges().sort_by_distance(p)[0] for p in [
        (38.825, 34.4, 6.3),
        (3.575, 3.45, -18.3),
        (3.575, 31.95, -18.3),
        (74.075, 31.95, -18.3),
        (74.075, 3.45, -18.3),
        (74.075, 17.7, -36.6),
        (38.825, 3.45, -36.6),
        (3.575, 17.7, -36.6),
        (38.825, 31.95, -36.6),
    ]]
    fillet(f13_edges, radius=F13_R)

    # F14
    f14_edges = [f1_1.edges().sort_by_distance(p)[0] for p in [
        (25.825, 7.7, 5.8),
        (25.825, 27.7, 5.8),
        (70.325, 27.7, 5.8),
        (70.325, 7.7, 5.8),
        (71.325, 6.7, 5.8),
        (71.325, 28.7, 5.8),
    ]]
    fillet(f14_edges, radius=F14_R)


solid = Compound([f9.part, f9b.part, f9c.part, f9d.part, f10.part, f1_1.part])
